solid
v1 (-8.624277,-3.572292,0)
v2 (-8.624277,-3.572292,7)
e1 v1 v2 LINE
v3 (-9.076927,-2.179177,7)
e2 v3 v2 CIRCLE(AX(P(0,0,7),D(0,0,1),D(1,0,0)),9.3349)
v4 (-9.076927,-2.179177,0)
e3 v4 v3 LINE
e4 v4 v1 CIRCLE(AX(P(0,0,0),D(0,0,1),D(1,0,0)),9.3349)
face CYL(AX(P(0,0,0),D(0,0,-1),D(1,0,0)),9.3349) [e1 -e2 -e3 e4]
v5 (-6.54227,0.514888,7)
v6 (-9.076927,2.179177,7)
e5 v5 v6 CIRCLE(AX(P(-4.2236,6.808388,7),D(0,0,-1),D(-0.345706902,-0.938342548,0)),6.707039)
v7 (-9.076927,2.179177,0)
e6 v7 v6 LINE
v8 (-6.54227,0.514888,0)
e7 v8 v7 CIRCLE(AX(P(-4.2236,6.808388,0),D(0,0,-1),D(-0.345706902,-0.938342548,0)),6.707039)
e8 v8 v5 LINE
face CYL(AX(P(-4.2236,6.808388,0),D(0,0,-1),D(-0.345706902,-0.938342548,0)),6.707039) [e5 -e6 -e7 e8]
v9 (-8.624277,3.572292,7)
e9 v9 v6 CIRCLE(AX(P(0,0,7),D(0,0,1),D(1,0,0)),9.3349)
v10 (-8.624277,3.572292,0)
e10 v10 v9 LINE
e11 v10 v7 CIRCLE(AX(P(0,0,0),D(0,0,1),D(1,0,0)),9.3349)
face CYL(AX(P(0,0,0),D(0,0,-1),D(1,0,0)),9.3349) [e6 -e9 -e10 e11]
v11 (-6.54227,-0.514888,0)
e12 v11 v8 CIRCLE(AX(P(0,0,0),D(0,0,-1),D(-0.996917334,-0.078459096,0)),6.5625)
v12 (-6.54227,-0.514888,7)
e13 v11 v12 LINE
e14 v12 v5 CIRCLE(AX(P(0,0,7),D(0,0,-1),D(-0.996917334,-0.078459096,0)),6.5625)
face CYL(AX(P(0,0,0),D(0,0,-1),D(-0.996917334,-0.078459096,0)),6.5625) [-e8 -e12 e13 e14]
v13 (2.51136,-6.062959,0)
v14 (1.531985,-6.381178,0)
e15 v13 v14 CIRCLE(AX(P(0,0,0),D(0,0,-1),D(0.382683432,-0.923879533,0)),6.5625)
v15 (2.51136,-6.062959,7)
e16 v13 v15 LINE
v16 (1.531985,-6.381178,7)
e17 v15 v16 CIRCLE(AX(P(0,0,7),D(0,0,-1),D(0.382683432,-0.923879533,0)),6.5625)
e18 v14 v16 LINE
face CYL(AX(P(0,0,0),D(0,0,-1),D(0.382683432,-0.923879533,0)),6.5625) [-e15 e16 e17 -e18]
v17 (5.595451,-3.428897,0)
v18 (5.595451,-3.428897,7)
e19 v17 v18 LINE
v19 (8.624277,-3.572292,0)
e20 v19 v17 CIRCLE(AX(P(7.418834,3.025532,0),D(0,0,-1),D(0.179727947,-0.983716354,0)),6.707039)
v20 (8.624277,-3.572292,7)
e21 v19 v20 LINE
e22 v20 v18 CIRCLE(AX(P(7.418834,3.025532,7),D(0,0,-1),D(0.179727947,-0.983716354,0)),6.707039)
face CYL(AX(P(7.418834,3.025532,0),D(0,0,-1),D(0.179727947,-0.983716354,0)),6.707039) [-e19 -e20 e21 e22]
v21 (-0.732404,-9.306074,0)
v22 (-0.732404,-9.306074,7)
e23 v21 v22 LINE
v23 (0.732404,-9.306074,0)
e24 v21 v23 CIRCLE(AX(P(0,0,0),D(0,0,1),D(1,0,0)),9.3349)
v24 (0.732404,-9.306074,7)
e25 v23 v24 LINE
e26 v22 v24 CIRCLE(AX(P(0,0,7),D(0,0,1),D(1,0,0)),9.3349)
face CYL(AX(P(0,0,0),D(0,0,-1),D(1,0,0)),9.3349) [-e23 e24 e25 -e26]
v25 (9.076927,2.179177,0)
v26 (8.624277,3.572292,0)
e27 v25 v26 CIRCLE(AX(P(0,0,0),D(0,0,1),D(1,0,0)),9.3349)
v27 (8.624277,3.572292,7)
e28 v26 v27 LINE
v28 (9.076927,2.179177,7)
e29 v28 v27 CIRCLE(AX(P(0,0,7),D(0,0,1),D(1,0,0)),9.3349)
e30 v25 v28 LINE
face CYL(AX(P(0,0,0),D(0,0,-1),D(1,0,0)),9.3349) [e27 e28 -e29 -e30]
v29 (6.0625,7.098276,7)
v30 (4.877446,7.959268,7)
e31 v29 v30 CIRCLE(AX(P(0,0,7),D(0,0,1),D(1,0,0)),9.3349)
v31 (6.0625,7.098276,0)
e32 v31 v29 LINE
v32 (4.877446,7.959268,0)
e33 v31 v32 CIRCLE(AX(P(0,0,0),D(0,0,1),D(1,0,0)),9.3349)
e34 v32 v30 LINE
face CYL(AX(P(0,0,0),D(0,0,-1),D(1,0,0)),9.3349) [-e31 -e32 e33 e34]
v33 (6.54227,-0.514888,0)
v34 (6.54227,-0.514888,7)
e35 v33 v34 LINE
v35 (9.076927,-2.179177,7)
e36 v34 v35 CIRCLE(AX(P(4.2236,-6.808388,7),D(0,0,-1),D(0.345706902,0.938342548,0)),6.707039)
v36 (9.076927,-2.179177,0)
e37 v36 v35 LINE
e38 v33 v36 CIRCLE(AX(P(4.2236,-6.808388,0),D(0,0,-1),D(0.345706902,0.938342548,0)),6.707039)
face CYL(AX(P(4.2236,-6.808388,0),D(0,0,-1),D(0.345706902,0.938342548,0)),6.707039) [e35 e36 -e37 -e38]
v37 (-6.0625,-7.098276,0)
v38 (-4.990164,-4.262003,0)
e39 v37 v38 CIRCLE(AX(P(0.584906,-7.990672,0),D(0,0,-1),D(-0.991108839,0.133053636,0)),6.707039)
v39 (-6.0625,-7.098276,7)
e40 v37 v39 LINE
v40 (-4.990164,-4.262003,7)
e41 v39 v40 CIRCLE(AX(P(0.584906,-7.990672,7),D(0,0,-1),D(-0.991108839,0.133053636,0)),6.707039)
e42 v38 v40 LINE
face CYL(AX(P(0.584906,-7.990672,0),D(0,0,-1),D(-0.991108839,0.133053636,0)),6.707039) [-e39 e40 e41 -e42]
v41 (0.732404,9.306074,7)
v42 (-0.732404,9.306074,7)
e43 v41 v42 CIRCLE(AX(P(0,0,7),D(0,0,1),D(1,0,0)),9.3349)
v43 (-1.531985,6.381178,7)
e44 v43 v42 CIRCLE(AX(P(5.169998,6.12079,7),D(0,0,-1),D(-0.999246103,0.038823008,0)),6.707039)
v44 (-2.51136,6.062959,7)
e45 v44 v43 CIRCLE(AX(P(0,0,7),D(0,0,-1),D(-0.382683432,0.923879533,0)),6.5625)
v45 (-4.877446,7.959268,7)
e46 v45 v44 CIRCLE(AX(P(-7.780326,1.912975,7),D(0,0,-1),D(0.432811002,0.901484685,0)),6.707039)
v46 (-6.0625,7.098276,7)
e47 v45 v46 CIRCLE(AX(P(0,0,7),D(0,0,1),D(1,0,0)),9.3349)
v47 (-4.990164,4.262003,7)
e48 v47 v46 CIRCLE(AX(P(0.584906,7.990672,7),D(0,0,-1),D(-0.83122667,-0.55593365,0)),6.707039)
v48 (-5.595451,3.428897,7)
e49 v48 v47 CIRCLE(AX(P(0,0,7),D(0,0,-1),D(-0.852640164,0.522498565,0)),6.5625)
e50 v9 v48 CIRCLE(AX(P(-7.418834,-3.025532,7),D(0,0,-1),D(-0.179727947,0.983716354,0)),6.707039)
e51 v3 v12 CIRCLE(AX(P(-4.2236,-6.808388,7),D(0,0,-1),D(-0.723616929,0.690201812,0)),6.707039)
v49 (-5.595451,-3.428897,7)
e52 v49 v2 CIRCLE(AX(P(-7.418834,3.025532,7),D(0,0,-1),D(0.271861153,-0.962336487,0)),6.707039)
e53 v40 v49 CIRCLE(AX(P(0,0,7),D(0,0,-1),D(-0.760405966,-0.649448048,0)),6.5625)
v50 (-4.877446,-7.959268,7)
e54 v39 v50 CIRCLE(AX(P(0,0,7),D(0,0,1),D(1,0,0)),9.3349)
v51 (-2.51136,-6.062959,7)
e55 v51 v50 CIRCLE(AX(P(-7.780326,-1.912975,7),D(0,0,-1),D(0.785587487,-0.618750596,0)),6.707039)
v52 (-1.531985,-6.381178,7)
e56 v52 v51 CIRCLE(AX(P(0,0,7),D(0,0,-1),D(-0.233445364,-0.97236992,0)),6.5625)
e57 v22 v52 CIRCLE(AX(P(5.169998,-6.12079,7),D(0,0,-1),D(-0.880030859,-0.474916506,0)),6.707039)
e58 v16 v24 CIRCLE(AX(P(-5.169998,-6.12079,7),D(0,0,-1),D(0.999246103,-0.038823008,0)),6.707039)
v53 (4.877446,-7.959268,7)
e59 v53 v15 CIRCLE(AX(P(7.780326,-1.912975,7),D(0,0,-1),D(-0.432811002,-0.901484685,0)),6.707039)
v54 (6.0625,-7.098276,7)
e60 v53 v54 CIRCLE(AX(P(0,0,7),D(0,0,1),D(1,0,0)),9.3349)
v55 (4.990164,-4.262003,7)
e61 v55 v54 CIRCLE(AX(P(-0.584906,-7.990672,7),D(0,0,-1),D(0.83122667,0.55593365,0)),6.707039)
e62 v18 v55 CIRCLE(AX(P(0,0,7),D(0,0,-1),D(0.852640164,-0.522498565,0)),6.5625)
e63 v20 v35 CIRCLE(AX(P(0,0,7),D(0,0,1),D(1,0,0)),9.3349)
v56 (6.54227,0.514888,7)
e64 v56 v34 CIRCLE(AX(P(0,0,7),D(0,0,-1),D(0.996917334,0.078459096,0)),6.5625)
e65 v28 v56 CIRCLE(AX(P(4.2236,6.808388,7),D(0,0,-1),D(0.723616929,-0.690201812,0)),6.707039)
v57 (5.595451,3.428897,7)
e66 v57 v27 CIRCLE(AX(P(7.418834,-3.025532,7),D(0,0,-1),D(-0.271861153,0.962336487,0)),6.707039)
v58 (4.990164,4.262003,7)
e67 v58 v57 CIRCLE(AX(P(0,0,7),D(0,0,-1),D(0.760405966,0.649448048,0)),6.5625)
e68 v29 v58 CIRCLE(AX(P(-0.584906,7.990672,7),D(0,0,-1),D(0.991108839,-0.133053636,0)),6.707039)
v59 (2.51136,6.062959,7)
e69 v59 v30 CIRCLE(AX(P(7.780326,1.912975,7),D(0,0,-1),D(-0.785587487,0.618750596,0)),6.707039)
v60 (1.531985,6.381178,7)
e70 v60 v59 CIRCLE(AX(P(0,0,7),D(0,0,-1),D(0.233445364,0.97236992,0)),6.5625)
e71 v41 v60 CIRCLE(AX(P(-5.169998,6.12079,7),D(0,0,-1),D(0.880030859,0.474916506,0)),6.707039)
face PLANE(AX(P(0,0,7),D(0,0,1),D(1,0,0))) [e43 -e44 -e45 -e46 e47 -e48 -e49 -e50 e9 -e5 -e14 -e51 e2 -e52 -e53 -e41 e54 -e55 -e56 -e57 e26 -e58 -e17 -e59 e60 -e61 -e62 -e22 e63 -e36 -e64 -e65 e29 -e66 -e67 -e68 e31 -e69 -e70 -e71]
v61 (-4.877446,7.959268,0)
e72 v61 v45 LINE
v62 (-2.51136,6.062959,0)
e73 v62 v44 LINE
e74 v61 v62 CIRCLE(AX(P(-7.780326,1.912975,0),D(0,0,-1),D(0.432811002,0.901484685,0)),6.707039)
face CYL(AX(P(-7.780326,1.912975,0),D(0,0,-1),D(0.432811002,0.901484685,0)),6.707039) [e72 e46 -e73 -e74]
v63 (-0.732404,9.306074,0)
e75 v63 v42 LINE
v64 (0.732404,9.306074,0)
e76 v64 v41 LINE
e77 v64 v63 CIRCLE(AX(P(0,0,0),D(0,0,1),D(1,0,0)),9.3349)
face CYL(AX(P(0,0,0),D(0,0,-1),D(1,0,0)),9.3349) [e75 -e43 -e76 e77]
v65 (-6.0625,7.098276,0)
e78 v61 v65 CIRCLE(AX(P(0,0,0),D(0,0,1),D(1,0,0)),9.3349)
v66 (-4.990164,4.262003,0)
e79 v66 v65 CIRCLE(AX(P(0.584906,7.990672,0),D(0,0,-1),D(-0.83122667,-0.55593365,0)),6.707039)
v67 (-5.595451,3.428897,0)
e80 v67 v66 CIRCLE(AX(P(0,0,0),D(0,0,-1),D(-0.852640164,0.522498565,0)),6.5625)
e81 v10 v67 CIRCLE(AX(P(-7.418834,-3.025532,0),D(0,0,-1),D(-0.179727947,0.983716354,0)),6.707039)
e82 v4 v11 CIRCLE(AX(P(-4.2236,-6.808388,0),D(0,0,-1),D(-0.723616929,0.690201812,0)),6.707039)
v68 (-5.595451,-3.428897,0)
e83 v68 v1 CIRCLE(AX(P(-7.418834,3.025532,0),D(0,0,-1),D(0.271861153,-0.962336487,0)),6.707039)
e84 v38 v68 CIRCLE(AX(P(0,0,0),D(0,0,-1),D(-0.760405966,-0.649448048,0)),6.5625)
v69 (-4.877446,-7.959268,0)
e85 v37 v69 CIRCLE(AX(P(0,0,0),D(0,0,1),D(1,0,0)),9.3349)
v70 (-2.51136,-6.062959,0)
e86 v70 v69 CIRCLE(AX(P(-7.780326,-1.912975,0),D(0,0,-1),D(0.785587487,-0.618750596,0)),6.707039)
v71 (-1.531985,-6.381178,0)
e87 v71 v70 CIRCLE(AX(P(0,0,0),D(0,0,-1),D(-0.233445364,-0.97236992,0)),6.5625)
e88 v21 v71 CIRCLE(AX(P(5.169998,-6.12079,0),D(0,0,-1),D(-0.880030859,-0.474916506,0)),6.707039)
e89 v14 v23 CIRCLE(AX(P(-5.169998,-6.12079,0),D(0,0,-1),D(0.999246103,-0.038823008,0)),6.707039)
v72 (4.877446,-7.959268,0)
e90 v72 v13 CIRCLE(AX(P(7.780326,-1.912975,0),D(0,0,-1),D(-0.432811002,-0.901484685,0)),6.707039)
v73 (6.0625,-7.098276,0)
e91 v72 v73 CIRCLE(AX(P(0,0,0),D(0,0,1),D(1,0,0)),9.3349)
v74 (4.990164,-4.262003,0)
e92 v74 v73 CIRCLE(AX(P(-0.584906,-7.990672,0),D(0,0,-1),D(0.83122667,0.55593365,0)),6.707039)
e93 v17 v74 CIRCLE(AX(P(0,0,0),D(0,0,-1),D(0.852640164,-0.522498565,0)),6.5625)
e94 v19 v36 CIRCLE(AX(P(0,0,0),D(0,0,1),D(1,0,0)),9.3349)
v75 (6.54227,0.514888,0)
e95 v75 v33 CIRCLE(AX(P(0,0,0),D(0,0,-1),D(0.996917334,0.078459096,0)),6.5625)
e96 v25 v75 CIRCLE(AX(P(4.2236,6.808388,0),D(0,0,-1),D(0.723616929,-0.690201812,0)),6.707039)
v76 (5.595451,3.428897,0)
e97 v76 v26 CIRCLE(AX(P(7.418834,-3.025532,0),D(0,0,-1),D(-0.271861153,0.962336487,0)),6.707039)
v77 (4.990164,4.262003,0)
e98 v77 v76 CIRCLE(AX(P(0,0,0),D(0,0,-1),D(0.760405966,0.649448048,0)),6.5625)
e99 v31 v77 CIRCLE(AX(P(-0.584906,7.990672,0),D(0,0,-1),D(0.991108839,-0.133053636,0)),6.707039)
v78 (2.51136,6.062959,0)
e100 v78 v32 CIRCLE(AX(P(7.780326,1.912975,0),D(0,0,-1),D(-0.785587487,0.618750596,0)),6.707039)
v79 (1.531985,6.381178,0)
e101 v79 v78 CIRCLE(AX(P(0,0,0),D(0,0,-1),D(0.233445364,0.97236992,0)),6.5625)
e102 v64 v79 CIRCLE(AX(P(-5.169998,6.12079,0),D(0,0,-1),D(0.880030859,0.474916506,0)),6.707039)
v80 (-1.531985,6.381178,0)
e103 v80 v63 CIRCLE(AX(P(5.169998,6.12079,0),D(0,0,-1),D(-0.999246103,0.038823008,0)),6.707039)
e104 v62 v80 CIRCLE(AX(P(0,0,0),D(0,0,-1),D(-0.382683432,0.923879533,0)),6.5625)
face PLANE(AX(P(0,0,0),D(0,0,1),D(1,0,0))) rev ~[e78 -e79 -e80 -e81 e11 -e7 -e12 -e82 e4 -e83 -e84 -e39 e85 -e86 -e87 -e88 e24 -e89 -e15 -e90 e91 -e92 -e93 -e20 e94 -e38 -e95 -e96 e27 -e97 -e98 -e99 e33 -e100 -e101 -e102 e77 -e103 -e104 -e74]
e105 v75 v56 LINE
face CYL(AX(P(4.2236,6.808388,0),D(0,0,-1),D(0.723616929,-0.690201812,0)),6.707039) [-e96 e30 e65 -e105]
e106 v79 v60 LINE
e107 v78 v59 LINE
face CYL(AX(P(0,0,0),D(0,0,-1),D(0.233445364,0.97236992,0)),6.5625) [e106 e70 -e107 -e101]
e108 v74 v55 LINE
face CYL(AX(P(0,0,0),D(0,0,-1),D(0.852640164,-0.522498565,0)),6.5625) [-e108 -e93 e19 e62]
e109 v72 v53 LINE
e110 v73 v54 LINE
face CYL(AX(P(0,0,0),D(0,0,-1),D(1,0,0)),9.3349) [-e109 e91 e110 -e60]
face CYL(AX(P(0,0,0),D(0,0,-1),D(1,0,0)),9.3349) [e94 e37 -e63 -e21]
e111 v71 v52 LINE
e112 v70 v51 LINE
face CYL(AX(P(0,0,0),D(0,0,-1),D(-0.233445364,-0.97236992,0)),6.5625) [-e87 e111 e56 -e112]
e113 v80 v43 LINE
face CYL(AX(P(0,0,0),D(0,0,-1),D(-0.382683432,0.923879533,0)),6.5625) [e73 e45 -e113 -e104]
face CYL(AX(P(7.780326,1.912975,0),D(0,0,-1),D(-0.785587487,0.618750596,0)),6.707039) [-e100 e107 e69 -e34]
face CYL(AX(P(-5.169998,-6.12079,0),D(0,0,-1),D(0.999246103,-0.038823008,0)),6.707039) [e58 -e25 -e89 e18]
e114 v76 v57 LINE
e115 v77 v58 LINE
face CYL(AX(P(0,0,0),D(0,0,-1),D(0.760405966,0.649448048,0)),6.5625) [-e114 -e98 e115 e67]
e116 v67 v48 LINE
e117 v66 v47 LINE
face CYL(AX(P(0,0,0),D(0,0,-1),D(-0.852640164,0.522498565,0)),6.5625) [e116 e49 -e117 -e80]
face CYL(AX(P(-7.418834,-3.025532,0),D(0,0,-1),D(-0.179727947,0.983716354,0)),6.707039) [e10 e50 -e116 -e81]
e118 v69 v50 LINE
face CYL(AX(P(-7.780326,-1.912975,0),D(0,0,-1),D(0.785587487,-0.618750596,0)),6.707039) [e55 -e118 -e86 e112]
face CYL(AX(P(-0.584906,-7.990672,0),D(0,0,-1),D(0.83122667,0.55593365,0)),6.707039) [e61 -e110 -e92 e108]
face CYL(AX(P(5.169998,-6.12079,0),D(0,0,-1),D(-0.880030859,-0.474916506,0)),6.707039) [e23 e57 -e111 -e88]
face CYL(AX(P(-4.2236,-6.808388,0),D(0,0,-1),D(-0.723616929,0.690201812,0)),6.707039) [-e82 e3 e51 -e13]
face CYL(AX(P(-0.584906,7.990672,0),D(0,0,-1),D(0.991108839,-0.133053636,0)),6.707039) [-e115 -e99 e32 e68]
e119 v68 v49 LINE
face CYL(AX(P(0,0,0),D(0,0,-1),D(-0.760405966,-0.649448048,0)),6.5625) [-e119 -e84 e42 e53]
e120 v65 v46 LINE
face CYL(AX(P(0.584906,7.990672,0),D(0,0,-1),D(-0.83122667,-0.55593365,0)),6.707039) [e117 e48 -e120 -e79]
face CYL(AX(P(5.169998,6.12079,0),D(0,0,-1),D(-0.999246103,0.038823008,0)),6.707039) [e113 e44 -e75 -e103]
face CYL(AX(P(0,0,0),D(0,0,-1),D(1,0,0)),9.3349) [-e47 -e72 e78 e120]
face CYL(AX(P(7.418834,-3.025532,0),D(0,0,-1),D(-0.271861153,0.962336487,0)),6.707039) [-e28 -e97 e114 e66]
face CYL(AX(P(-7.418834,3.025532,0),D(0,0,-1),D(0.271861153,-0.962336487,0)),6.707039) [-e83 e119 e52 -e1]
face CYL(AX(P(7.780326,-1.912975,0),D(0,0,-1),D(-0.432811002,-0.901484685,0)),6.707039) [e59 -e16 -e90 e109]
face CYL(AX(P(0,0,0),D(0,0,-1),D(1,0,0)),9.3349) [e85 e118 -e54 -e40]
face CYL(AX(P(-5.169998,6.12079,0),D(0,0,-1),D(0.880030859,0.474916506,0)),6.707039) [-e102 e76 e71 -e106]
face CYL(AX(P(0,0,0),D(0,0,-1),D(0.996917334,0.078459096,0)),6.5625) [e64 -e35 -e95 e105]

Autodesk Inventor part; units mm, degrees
sketch "Sketch1" plane through (0, 0, 0) normal (0, 0, 1) x (1, 0, 0)
  circle A0 centre (0, 0) radius 9.3349
  dimension "d0" = 18.6697
extrude "Extrusion1" add sketch "Sketch1" along normal blind 7
ref_plane "Work Plane2" through (0, 0, 3.5) normal (0, 0, 1) x (1, 0, 0)
sketch "Sketch2" plane through (0, 0, 0) normal (0, 0, -1) x (-1, 0, 0)
  circle A0 centre (0, 0) radius 9.3349 projected
  circle A1 centre (0, 0) radius 8.75
  dimension "d3" = 17.5
surface extrude "Pitch Diameter" sketch "Sketch2" against normal through all shown no curves A1
ref_plane "Work Plane8" through (0, 0, 0) normal (0.9510565, 0.309017, 0) x (0, 0, 1)
ref_plane "Work Plane9" through (0, 0, 0) normal (1, 0, 0) x (0, 1, 0)
spur gear teeth "Spur Gear" teeth 10 pitch diameter 17.5 tip diameter 18.6697 root diameter 13.125 face width 7 start plane through (0, 0, 0) normal (0, 0, -1) x (-1, 0, 0)
equation "\"d0\" = da_da"
equation "\"d1\" = da_b"
equation "\"d3\" = da_d"
equation "\"d16\" = da_aw"
equation "\"d43\" = da_aw"
equation "\"d46\" = da_aw"
equation "\"da_da\" = 18.669741"
equation "\"da_b\" = 7"
equation "\"da_d\" = 17.5"
equation "\"da_aw\" = 49.329371"
properties part number "Spur Gear1" material "Steel"
